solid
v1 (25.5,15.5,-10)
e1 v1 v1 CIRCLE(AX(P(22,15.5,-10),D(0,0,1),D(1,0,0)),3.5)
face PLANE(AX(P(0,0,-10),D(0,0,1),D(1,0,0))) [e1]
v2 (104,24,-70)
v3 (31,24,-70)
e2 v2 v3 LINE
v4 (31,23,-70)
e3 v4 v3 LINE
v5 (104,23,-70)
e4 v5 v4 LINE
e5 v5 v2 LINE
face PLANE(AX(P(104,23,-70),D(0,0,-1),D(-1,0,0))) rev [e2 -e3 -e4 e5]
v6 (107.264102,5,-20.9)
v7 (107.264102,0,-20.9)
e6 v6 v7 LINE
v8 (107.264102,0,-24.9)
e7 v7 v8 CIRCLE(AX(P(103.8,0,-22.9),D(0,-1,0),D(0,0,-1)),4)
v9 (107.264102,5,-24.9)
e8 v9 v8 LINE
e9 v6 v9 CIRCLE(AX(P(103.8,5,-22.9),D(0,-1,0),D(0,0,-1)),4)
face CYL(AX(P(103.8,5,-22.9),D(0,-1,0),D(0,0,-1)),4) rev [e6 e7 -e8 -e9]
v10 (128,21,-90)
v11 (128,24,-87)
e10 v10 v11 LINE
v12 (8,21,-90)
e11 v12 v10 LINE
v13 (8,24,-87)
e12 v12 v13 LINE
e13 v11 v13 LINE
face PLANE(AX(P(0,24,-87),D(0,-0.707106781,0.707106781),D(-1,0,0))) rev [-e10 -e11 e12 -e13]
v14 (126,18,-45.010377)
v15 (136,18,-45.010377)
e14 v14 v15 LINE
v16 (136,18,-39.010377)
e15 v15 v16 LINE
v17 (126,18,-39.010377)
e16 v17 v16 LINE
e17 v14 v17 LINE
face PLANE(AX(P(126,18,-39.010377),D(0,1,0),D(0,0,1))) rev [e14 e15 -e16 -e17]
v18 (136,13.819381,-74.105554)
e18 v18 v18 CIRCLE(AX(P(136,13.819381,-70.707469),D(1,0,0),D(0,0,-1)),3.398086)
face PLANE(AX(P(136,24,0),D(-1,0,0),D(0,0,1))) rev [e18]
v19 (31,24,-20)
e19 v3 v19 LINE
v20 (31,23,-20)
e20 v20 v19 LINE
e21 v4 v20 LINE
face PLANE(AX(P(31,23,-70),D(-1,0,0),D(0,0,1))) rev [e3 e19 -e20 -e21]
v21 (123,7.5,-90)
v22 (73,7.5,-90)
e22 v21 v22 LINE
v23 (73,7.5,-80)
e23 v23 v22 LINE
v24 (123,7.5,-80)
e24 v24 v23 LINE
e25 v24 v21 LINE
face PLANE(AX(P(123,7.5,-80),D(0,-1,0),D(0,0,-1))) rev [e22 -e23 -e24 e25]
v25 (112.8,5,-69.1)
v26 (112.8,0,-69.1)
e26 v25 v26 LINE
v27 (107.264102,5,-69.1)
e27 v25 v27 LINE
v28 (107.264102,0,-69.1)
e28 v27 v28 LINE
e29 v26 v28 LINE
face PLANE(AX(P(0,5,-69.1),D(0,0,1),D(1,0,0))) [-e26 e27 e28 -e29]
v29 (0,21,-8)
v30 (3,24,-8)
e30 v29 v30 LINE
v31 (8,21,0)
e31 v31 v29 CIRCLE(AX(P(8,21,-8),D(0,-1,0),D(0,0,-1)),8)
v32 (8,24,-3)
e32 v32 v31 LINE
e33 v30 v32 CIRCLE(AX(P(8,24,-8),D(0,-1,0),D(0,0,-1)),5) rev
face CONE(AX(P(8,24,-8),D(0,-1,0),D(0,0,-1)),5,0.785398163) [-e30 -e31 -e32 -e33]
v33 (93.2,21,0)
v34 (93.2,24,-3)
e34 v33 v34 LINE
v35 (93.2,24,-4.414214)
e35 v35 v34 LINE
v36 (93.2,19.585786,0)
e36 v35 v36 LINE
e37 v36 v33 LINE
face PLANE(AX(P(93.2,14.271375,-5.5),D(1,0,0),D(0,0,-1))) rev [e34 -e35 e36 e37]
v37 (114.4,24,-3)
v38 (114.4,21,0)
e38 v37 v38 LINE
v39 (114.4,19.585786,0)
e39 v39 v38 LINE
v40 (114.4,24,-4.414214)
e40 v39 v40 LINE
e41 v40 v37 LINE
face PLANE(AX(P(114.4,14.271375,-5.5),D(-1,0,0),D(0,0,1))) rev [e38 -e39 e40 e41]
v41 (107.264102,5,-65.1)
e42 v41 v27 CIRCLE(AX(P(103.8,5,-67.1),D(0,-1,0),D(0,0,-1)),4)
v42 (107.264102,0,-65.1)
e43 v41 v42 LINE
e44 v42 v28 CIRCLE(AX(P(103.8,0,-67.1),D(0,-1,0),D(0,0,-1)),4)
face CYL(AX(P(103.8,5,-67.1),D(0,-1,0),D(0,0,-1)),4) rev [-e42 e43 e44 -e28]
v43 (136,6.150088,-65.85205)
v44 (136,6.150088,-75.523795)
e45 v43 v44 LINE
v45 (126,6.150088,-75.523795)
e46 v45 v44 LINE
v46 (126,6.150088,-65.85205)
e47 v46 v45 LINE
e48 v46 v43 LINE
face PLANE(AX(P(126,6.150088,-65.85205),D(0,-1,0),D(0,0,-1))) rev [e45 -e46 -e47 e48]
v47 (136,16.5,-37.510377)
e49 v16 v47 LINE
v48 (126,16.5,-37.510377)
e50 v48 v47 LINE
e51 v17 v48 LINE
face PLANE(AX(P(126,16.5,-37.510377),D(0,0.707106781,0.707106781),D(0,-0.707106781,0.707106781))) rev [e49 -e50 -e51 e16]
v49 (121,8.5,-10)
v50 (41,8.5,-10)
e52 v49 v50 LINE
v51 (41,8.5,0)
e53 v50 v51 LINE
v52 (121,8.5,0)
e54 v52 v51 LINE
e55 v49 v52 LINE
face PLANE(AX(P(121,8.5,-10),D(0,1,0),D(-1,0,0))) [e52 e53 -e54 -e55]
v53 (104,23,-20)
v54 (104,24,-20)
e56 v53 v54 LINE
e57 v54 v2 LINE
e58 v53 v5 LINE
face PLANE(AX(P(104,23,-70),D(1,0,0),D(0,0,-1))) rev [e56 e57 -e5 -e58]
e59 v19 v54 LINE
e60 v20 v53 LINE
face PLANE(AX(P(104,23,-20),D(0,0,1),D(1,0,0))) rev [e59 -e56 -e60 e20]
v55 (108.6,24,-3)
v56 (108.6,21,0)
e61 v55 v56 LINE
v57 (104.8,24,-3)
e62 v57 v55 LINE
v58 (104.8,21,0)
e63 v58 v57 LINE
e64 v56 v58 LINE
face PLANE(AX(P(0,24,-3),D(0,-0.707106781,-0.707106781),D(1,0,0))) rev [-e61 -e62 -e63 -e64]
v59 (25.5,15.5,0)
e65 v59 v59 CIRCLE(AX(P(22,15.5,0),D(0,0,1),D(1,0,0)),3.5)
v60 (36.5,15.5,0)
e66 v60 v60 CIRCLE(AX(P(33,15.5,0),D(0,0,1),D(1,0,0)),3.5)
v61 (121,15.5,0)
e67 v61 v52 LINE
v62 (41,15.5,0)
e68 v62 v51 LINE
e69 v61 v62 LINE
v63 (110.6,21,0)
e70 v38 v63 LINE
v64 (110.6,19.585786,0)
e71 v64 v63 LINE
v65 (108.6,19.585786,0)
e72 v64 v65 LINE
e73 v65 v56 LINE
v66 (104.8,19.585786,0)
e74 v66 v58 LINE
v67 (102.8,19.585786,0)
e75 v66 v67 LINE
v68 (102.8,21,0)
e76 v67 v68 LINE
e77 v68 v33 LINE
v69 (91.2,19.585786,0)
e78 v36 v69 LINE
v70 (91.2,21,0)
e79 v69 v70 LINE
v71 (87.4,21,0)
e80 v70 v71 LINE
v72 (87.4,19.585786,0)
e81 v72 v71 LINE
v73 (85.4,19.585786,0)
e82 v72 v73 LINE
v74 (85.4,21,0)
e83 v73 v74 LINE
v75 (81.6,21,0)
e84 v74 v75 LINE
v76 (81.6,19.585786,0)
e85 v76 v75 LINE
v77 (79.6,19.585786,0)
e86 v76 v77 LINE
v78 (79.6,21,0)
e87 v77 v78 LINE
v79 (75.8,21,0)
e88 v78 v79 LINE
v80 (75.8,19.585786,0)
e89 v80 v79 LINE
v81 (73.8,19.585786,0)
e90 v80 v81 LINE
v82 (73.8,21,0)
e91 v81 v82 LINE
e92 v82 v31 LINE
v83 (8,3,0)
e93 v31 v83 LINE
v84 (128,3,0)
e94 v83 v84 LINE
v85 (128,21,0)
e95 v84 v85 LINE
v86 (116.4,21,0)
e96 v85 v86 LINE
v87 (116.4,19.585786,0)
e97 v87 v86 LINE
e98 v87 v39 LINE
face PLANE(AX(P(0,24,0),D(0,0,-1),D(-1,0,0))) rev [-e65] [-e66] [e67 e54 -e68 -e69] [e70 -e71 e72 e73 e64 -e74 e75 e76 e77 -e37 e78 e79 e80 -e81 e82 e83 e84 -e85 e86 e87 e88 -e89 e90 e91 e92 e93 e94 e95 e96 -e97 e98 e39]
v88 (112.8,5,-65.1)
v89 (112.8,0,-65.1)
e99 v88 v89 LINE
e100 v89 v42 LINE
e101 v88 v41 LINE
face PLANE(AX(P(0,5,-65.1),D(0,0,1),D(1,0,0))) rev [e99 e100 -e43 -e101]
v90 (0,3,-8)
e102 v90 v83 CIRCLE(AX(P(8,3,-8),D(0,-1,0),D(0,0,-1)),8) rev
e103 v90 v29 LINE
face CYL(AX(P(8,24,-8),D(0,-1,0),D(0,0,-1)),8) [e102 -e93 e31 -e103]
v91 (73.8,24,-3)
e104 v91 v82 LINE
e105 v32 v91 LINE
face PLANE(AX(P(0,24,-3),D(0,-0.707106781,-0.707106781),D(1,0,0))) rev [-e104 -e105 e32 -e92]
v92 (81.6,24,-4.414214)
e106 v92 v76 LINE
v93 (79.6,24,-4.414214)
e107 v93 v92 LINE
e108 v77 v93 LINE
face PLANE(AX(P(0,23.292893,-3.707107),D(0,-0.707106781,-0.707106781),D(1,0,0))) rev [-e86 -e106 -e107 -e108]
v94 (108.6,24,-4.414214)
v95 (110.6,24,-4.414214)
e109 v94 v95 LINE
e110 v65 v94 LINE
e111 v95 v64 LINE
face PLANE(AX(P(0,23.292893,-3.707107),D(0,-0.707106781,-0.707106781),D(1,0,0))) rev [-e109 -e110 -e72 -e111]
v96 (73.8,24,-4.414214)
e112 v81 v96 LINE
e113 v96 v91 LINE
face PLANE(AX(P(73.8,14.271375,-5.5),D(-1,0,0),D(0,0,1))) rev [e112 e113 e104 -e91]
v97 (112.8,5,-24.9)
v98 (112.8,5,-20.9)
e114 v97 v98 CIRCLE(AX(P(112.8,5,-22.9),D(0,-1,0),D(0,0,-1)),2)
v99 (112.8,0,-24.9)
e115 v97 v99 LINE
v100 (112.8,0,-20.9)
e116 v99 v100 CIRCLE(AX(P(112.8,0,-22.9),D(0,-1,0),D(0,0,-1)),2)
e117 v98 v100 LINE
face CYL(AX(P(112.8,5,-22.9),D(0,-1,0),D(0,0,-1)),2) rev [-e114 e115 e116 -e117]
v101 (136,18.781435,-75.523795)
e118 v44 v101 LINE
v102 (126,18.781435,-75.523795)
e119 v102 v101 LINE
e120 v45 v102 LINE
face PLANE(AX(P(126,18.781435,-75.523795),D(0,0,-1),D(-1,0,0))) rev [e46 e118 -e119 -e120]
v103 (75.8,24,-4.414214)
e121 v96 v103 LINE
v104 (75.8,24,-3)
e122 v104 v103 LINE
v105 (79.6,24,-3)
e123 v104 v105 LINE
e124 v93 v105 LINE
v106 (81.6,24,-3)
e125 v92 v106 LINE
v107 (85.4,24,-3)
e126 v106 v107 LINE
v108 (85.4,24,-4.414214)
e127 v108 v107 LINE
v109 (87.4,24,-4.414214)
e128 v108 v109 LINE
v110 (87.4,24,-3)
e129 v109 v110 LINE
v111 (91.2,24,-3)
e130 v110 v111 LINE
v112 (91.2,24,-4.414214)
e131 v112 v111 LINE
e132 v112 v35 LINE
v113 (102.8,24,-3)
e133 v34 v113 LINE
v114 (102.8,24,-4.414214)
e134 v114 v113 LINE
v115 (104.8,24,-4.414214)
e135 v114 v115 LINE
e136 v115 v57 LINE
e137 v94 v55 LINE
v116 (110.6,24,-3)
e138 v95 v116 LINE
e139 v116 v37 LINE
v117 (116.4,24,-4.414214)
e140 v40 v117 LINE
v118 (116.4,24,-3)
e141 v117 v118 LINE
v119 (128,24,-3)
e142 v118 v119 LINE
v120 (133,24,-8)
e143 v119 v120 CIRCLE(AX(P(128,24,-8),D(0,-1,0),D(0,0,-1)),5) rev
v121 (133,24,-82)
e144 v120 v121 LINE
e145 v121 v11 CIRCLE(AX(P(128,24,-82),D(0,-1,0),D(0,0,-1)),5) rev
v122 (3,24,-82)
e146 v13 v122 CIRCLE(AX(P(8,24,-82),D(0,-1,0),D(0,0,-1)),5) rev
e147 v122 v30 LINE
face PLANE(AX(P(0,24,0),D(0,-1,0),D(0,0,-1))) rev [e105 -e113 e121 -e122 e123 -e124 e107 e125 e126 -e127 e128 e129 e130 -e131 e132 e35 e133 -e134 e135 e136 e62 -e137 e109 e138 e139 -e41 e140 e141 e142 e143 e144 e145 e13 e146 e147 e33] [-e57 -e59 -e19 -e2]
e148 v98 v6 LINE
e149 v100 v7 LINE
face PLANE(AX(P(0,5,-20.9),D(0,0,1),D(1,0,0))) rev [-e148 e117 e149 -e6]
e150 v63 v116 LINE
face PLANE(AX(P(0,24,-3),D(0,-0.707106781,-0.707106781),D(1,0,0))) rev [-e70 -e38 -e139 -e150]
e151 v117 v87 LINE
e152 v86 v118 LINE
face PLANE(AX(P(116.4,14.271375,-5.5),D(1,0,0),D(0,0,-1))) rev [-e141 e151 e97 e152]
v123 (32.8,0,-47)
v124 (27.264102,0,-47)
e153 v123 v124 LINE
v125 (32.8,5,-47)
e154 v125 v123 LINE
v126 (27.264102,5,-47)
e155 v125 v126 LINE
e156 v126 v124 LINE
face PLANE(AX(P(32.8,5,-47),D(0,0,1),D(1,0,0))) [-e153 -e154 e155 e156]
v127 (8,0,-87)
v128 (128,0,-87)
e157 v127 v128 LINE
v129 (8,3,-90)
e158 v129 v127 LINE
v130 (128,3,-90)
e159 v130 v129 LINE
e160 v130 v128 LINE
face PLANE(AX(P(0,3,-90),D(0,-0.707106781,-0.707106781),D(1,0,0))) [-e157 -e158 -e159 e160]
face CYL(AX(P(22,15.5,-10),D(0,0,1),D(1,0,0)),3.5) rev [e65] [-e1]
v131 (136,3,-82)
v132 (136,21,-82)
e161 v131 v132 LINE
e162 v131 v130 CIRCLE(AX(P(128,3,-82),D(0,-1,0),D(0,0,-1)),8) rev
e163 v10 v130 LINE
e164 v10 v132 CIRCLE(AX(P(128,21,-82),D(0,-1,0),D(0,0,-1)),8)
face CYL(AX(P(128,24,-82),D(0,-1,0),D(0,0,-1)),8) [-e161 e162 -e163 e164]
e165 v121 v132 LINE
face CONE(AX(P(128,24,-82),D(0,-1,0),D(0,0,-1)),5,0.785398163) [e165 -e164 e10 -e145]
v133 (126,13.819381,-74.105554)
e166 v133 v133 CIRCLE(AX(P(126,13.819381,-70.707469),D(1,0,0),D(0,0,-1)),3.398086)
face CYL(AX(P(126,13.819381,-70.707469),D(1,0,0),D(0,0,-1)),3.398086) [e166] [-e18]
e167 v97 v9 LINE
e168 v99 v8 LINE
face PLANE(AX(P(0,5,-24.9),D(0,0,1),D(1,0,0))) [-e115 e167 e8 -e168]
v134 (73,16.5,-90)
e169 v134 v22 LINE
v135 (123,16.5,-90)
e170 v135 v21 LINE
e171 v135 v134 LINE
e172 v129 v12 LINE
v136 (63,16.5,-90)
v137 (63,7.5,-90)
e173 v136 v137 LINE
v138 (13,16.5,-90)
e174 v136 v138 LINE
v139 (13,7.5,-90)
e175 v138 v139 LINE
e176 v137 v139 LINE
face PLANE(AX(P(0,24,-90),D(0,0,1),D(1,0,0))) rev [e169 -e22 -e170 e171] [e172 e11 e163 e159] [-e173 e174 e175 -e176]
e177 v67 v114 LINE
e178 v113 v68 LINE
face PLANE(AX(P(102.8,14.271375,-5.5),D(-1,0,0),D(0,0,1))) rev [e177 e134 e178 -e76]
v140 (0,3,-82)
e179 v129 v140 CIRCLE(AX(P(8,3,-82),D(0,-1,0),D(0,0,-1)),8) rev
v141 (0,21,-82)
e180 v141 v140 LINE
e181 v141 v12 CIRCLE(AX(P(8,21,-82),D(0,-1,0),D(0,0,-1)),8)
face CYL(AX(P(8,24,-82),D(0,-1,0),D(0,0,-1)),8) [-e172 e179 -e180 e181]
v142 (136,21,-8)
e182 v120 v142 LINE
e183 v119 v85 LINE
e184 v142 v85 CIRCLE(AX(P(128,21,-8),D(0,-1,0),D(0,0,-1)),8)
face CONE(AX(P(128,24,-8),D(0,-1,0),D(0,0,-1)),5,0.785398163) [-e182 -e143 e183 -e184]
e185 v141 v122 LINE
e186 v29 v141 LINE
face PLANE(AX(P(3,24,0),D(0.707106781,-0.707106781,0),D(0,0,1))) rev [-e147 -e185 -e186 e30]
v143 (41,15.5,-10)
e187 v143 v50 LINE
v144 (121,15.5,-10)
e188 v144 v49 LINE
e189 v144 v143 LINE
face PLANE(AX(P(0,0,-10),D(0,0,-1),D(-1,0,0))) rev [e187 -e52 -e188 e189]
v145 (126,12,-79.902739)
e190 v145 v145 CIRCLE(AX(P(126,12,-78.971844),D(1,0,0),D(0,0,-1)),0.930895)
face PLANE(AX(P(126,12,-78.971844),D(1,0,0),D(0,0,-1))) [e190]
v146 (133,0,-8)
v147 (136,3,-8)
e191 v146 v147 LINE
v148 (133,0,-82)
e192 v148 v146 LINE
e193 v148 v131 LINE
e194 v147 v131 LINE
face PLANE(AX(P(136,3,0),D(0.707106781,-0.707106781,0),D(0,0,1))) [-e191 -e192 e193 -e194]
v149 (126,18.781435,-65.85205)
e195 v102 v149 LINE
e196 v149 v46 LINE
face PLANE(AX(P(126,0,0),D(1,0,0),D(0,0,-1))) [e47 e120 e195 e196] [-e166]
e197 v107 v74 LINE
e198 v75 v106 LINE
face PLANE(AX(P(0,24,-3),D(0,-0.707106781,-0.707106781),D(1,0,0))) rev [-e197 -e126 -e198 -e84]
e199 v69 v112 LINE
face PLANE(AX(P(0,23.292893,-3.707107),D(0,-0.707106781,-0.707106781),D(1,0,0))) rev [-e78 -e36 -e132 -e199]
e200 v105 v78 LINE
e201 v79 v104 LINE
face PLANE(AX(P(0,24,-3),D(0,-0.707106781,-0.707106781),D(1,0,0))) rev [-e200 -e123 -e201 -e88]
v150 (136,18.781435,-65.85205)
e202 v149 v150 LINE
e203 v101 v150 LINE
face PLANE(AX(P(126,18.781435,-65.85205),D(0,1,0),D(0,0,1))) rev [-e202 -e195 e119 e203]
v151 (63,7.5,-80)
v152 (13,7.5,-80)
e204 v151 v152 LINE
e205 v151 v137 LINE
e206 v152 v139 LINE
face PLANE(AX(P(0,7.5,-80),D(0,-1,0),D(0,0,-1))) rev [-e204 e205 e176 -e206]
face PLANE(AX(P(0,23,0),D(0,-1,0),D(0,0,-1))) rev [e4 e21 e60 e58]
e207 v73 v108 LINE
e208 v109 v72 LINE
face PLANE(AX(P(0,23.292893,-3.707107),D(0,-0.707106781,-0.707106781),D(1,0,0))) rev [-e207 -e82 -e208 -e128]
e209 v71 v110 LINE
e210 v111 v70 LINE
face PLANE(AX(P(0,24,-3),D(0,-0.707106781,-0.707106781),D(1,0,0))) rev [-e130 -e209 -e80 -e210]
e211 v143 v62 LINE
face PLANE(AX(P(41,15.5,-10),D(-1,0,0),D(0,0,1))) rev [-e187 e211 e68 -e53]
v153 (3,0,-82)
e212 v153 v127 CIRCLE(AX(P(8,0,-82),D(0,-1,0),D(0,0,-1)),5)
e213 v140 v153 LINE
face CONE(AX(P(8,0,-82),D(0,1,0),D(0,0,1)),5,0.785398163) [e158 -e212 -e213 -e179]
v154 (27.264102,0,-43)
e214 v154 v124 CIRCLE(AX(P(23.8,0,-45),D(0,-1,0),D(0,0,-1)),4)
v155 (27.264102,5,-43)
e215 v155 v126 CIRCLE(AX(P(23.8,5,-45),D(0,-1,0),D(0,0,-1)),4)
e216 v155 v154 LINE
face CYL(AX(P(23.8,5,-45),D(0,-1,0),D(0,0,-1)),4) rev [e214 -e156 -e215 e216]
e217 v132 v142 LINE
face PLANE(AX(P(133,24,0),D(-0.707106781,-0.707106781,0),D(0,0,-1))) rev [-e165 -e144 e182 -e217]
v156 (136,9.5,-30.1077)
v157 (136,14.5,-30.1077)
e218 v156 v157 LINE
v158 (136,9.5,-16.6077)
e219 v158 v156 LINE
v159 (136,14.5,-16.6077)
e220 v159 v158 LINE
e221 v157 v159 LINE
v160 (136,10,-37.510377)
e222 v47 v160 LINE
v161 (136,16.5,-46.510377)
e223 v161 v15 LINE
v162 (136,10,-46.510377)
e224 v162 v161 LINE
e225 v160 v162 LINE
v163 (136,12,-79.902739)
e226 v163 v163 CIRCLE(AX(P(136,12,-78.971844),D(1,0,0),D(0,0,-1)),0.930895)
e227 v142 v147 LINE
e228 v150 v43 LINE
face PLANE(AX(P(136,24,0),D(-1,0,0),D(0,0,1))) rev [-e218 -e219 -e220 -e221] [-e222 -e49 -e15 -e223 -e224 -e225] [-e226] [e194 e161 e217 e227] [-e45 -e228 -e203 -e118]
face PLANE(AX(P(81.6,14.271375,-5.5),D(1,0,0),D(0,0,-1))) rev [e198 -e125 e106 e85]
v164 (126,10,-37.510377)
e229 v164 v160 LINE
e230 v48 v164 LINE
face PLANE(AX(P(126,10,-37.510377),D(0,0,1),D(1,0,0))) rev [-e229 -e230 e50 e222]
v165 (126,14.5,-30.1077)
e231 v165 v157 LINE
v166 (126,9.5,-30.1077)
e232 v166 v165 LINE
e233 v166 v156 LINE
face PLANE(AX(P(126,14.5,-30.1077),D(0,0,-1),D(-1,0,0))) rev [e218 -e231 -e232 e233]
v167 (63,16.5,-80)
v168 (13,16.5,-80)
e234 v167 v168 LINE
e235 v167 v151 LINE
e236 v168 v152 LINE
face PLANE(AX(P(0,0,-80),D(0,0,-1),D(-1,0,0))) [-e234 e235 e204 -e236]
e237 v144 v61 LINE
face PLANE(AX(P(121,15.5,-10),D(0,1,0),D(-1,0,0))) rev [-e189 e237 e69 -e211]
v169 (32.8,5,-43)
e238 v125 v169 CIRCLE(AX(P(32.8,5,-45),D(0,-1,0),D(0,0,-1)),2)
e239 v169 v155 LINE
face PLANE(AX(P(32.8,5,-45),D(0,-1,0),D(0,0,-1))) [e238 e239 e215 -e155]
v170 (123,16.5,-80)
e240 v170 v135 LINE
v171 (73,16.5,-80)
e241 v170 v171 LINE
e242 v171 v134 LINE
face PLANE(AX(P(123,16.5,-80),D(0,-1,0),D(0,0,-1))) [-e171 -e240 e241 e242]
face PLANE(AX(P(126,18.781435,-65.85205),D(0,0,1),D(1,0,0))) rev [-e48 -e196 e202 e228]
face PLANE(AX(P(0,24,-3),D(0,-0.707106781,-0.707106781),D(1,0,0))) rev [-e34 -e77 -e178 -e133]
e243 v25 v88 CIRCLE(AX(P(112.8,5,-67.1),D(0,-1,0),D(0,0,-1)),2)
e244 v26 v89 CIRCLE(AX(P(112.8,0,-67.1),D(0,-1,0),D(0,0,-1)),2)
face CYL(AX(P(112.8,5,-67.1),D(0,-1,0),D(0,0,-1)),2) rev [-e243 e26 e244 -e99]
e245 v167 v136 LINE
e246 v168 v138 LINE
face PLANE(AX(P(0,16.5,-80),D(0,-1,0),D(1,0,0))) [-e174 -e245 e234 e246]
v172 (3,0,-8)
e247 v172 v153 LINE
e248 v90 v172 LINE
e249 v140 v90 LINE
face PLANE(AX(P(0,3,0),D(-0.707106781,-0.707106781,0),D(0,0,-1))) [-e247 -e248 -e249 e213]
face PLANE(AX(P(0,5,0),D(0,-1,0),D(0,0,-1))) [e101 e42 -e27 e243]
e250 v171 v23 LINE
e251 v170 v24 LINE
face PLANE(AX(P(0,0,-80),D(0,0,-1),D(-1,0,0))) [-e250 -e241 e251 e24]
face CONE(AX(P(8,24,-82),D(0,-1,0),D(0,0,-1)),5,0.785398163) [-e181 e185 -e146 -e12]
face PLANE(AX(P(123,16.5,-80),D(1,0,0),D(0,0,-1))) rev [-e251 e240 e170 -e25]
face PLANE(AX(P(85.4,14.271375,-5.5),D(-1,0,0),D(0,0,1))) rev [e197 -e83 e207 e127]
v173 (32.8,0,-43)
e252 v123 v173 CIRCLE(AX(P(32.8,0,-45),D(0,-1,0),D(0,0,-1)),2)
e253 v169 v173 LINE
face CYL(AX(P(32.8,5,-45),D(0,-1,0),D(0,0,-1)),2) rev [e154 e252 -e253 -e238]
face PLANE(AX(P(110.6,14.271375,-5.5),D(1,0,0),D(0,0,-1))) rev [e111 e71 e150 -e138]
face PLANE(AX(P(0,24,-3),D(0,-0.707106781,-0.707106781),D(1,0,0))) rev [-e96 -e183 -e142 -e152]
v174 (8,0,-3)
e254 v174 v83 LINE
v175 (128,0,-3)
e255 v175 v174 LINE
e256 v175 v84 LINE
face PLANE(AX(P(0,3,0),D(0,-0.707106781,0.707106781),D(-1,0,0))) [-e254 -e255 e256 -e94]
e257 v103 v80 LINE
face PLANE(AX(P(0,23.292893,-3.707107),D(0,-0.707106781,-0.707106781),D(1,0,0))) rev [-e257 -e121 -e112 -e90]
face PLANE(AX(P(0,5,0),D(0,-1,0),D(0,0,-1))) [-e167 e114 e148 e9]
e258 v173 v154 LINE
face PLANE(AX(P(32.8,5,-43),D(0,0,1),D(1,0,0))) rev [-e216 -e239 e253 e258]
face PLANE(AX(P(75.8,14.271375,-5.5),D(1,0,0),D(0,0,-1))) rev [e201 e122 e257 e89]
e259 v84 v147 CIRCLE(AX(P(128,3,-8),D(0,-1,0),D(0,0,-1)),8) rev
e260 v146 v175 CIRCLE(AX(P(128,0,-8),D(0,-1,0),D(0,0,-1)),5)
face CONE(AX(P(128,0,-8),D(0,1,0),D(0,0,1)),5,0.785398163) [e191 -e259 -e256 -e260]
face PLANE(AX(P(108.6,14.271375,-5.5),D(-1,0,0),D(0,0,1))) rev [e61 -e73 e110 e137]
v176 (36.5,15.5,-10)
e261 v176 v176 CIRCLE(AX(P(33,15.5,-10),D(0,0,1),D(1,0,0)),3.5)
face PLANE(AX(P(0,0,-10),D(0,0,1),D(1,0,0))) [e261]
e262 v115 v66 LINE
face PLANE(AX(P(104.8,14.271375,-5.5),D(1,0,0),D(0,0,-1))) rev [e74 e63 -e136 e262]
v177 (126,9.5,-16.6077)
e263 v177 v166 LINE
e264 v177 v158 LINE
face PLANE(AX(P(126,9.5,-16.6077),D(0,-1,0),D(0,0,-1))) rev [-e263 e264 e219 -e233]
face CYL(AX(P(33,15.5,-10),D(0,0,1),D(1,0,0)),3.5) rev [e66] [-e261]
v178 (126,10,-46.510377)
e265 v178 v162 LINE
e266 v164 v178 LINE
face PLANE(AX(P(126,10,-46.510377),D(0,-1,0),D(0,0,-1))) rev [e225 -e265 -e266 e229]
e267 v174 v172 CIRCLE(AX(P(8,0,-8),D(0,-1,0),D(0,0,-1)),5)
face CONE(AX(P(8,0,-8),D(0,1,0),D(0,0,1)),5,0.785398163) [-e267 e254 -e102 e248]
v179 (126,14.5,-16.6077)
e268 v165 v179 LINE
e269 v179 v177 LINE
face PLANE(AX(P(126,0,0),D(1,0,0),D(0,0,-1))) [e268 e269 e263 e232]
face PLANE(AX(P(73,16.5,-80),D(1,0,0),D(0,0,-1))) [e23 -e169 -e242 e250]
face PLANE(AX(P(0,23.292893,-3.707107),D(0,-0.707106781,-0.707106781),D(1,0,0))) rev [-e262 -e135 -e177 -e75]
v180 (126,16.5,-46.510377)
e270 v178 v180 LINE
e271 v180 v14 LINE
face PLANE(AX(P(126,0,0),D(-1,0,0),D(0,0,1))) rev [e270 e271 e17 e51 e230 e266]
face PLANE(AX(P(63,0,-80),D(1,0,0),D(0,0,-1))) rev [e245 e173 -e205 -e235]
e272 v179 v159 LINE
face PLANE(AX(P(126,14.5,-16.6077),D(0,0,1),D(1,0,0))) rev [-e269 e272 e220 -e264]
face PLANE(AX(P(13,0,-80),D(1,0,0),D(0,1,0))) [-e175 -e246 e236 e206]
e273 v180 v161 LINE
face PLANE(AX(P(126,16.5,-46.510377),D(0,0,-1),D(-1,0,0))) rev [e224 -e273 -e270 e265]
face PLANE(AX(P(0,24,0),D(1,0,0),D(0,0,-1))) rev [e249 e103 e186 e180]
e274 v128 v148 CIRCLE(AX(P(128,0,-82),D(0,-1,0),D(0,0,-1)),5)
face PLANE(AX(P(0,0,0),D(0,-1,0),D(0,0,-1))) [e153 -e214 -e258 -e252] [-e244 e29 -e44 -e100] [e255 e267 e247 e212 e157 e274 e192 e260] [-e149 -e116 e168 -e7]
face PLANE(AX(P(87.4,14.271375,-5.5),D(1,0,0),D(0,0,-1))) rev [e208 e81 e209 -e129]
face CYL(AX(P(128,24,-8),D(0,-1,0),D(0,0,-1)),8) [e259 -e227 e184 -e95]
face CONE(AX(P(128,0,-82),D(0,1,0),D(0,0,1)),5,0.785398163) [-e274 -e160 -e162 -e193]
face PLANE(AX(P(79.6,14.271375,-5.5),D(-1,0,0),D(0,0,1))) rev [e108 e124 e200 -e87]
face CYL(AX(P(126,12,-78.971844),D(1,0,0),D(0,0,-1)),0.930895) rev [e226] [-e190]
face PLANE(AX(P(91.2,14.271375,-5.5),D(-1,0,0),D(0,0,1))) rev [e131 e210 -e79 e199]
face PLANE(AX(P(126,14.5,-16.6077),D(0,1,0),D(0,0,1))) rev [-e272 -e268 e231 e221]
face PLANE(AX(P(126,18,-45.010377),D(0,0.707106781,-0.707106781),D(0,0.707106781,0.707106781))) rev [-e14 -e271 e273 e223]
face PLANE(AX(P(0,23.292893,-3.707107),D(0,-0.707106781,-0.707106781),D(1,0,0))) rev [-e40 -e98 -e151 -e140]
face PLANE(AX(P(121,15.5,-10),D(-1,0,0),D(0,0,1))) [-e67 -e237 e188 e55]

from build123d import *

# Parameters (mm, degrees)
SKETCH1_W           = 136
SKETCH1_H           = 90
BOSS_EXTRUDE1_DEPTH = 24
SKETCH4_R           = 0.930895073
SKETCH4_W           = 13.5
SKETCH4_H           = 5
SKETCH4_W_2         = 9.671745291
SKETCH4_H_2         = 12.631347156
SKETCH4_R_2         = 3.3980858
CUT_EXTRUDE1_DEPTH  = 10
SKETCH3_W           = 50
SKETCH3_H           = 9
CUT_EXTRUDE2_DEPTH  = 10
SKETCH2_R           = 3.5
SKETCH2_W           = 80
SKETCH2_H           = 7
CUT_EXTRUDE3_DEPTH  = 10
FILLET1_R           = 8
CHAMFER1_SIZE       = 3
CUT_EXTRUDE4_DEPTH  = 5
CUT_EXTRUDE5_START  = 73.8
CUT_EXTRUDE5_DEPTH  = 2
LPATTERN1_COUNT     = 8
LPATTERN1_PITCH     = 5.8
SKETCH7_W           = 73
SKETCH7_H           = 50
CUT_EXTRUDE6_DEPTH  = 1


# Read off the part's stored shape, not the designer's step: Cut-Extrude5
with BuildPart() as part:
    # Sketch1 → Boss-Extrude1 (new body)
    with BuildSketch(Plane(origin=(0, 0, 0), x_dir=(1, 0, 0), z_dir=(0, 1, 0))):
        with Locations((68, 45)):
            Rectangle(SKETCH1_W, SKETCH1_H)
    extrude(amount=BOSS_EXTRUDE1_DEPTH)

    # Sketch4 → Cut-Extrude1 (cut)
    # profile 1 of 4: a face of its own
    with BuildSketch(Plane(origin=(136, 0, 0), x_dir=(0, 0, -1), z_dir=(1, 0, 0))):
        with Locations((78.971843902, 12)):
            Circle(SKETCH4_R)
    # profile 2 of 4: a face of its own
    with BuildSketch(Plane(origin=(136, 0, 0), x_dir=(0, 0, -1), z_dir=(1, 0, 0))):
        Polygon((37.51037714, 10), (37.51037714, 16.5), (39.01037714, 18), (45.01037714, 18), (46.51037714, 16.5), (46.51037714, 10), align=None)
    # profile 3 of 4: a face of its own
    with BuildSketch(Plane(origin=(136, 0, 0), x_dir=(0, 0, -1), z_dir=(1, 0, 0))):
        with Locations((23.357700282, 12)):
            Rectangle(SKETCH4_W, SKETCH4_H)
    # profile 4 of 4: a face of its own
    with BuildSketch(Plane(origin=(136, 0, 0), x_dir=(0, 0, -1), z_dir=(1, 0, 0))):
        with Locations((70.687922275, 12.465761788)):
            Rectangle(SKETCH4_W_2, SKETCH4_H_2)
        with Locations((70.707468534, 13.819380659)):
            Circle(SKETCH4_R_2, mode=Mode.SUBTRACT)
    extrude(amount=-CUT_EXTRUDE1_DEPTH, mode=Mode.SUBTRACT)

    # Sketch3 → Cut-Extrude2 (cut)
    with BuildSketch(Plane(origin=(0, 0, -90), x_dir=(-1, 0, 0), z_dir=(0, 0, -1))):
        with Locations((-38, 12)):
            Rectangle(SKETCH3_W, SKETCH3_H)
        with Locations((-98, 12)):
            Rectangle(SKETCH3_W, SKETCH3_H)
    extrude(amount=-CUT_EXTRUDE2_DEPTH, mode=Mode.SUBTRACT)

    # Sketch2 → Cut-Extrude3 (cut)
    with BuildSketch(Plane.XY):
        with Locations((33, 15.5)):
            Circle(SKETCH2_R)
        with Locations((22, 15.5)):
            Circle(SKETCH2_R)
        with Locations((81, 12)):
            Rectangle(SKETCH2_W, SKETCH2_H)
    extrude(amount=-CUT_EXTRUDE3_DEPTH, mode=Mode.SUBTRACT)

    # Fillet1
    fillet1_edges = [part.edges().sort_by_distance(p)[0] for p in [
        (0, 12, -90),
        (136, 12, -90),
        (136, 12, 0),
        (0, 12, 0),
    ]]
    fillet(fillet1_edges, radius=FILLET1_R)

    # Chamfer1
    chamfer1_edges = [part.edges().sort_by_distance(p)[0] for p in [
        (0, 0, -45),
        (0, 24, -45),
        (68, 0, -90),
        (136, 0, -45),
        (68, 0, 0),
        (133.656854249, 0, -87.656854249),
        (133.656854249, 0, -2.343145751),
        (2.343145751, 0, -2.343145751),
        (2.343145751, 0, -87.656854249),
        (68, 24, -90),
        (68, 24, 0),
        (136, 24, -45),
        (133.656854249, 24, -87.656854249),
        (133.656854249, 24, -2.343145751),
        (2.343145751, 24, -2.343145751),
        (2.343145751, 24, -87.656854249),
    ]]
    chamfer(chamfer1_edges, length=CHAMFER1_SIZE)

    # Sketch5 → Cut-Extrude4 (cut)
    with BuildSketch(Plane.XZ):
        with BuildLine():
            Line((32.8, -43), (27.264101615, -43))
            ThreePointArc((27.264101615, -43), (19.8, -45), (27.264101615, -47))
            Line((27.264101615, -47), (32.8, -47))
            ThreePointArc((32.8, -47), (34.8, -45), (32.8, -43))
        make_face()
        with BuildLine():
            Line((112.8, -24.9), (107.264101615, -24.9))
            ThreePointArc((107.264101615, -24.9), (99.8, -22.9), (107.264101615, -20.9))
            Line((107.264101615, -20.9), (112.8, -20.9))
            ThreePointArc((112.8, -20.9), (114.8, -22.9), (112.8, -24.9))
        make_face()
        with BuildLine():
            Line((112.8, -65.1), (107.264101615, -65.1))
            ThreePointArc((107.264101615, -65.1), (99.8, -67.1), (107.264101615, -69.1))
            Line((107.264101615, -69.1), (112.8, -69.1))
            ThreePointArc((112.8, -69.1), (114.8, -67.1), (112.8, -65.1))
        make_face()
    extrude(amount=-CUT_EXTRUDE4_DEPTH, mode=Mode.SUBTRACT)

    # Cut-Extrude5 outline → Cut-Extrude5 (cut)
    with BuildSketch(Plane.YZ.offset(CUT_EXTRUDE5_START)):
        Polygon((21, 0), (19.585786438, 0), (24, -4.414213562), (24, -3), align=None)
    cut_extrude5 = extrude(amount=CUT_EXTRUDE5_DEPTH, mode=Mode.SUBTRACT)

    # LPattern1: Cut-Extrude5 ×8, 1 skipped
    with Locations(*[(i * LPATTERN1_PITCH, 0, 0) for i in range(1, LPATTERN1_COUNT) if i not in (4,)]):
        add(cut_extrude5, mode=Mode.SUBTRACT)

    # Sketch7 → Cut-Extrude6 (cut)
    with BuildSketch(Plane(origin=(0, 24, 0), x_dir=(1, 0, 0), z_dir=(0, 1, 0))):
        with Locations((67.5, 45)):
            Rectangle(SKETCH7_W, SKETCH7_H)
    extrude(amount=-CUT_EXTRUDE6_DEPTH, mode=Mode.SUBTRACT)


solid = part.part
